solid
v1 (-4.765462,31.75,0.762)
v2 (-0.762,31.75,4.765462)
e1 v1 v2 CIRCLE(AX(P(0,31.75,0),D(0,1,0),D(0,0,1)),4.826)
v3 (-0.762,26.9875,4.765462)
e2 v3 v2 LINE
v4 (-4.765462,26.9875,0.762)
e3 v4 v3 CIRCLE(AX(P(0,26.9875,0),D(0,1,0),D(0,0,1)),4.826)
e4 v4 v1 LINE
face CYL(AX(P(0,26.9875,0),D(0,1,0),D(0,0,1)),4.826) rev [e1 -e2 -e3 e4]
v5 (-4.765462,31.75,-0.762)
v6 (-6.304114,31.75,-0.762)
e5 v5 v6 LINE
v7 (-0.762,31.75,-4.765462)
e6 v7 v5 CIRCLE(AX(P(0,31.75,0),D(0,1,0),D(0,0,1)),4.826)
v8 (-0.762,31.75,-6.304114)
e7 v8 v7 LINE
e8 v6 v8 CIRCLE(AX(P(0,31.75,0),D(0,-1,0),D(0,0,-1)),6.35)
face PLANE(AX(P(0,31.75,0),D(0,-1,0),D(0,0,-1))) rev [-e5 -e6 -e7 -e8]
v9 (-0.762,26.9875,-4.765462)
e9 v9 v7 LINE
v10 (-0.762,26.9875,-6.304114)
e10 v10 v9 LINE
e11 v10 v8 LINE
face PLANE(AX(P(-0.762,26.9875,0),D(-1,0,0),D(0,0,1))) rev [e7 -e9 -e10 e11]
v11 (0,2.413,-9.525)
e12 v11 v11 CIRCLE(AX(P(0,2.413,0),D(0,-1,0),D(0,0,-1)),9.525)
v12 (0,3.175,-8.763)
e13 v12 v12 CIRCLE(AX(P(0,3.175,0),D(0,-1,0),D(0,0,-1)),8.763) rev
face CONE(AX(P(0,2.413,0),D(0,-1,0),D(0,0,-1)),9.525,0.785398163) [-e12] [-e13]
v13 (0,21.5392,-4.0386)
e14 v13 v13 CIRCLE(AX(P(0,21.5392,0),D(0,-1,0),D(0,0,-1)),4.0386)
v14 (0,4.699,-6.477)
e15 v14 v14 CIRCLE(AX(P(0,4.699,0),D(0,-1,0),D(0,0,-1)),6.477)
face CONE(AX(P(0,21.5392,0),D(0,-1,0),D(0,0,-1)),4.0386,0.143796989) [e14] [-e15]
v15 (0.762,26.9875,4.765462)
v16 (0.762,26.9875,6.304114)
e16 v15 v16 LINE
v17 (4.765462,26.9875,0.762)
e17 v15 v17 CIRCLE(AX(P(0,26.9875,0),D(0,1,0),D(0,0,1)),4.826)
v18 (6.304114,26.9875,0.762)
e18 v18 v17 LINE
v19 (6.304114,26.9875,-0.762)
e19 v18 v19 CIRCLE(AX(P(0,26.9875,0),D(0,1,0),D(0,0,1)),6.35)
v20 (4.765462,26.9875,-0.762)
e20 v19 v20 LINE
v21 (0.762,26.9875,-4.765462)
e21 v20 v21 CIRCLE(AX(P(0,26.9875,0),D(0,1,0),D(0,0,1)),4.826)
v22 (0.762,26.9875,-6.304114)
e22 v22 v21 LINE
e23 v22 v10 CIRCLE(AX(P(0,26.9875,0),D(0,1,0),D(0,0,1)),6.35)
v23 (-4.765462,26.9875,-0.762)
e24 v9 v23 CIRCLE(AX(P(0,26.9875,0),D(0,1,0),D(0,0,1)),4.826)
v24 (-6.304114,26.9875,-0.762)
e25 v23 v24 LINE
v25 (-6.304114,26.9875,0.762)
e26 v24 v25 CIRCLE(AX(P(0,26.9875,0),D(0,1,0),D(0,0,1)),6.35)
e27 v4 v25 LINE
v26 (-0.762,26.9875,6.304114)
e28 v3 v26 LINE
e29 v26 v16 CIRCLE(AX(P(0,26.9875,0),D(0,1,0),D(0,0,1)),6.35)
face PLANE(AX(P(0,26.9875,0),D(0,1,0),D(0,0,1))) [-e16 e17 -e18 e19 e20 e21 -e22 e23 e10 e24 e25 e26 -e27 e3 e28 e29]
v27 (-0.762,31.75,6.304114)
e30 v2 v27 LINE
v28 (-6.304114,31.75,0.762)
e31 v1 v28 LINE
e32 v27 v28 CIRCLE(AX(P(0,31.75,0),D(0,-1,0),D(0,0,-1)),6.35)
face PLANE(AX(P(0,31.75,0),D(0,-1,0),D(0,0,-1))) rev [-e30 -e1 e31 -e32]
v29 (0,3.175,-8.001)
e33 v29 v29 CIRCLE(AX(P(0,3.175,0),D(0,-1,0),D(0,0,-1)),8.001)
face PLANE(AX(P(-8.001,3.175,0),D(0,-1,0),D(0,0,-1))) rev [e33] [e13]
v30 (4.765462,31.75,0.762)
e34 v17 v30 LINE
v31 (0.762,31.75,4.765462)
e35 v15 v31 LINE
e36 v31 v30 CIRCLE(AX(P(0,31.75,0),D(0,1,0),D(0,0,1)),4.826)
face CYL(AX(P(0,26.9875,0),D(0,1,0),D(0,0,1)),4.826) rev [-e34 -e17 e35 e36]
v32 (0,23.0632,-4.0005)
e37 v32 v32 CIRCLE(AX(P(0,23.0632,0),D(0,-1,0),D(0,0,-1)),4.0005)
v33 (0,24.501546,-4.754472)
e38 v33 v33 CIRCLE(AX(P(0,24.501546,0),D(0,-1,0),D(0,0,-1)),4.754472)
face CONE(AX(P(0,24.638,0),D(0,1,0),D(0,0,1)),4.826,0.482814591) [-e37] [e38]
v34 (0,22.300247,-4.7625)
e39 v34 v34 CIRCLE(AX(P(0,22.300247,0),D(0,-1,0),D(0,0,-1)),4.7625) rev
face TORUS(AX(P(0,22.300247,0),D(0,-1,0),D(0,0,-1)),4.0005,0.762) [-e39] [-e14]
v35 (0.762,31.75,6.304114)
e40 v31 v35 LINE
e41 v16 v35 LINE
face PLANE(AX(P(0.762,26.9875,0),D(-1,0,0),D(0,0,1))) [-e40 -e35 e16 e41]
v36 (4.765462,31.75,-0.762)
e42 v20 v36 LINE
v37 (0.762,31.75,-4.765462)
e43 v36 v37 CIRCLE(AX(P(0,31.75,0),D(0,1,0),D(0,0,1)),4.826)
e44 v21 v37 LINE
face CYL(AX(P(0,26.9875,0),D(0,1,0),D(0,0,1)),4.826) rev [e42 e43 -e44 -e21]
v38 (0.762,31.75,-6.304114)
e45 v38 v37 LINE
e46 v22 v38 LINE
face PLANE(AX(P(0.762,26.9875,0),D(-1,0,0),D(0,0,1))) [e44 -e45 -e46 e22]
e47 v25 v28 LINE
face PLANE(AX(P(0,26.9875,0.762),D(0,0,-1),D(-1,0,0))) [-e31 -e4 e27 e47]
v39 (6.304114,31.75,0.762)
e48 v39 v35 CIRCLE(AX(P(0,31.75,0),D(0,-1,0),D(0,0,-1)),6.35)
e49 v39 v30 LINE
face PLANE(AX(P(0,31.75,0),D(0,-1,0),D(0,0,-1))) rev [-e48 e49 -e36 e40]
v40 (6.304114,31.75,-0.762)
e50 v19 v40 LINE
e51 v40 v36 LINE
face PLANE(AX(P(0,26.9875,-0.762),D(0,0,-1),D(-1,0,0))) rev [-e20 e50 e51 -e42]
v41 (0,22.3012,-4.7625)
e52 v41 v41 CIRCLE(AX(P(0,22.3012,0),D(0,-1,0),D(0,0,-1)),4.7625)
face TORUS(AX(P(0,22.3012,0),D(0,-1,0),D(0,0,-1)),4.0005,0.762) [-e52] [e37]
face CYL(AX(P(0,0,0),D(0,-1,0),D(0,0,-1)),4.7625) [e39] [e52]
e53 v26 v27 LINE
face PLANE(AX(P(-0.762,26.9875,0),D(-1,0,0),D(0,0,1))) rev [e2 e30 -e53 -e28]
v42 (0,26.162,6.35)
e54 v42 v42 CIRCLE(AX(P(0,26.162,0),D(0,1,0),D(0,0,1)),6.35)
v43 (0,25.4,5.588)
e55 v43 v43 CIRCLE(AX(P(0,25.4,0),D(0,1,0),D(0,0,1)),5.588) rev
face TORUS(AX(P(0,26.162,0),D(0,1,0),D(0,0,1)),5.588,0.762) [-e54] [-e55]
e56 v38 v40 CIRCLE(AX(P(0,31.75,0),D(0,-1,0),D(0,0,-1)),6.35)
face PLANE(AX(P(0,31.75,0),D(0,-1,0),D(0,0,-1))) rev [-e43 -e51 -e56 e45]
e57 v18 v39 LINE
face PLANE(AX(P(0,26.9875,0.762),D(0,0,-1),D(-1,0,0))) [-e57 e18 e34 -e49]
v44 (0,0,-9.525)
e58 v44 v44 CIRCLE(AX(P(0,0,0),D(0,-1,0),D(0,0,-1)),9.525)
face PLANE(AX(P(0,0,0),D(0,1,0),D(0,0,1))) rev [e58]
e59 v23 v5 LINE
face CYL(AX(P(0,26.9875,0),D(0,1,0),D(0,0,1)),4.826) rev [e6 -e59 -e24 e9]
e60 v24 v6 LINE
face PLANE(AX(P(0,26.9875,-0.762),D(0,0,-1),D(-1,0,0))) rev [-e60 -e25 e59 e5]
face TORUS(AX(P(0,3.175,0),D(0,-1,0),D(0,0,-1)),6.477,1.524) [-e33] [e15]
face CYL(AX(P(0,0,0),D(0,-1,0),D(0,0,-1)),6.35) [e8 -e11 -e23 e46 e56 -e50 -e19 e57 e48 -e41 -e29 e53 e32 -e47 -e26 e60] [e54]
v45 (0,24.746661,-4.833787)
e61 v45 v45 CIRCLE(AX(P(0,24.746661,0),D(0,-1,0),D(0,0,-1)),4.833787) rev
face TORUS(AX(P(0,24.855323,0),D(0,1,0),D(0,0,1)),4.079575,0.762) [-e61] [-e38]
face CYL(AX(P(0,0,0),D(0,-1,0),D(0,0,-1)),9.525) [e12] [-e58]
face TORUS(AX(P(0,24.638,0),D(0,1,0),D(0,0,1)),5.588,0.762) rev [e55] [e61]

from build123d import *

# Parameters (mm, degrees)
CHAMFER1_SIZE      = 0.762
FILLET1_R          = 1.524
FILLET3_R          = 0.762
SKETCH3_W          = 1.524
SKETCH3_H          = 1.524
CUT_EXTRUDE1_DEPTH = 4.7625


with BuildPart() as part:
    # Sketch1 → Revolve1 (revolve)
    with BuildSketch(Plane.XY, mode=Mode.PRIVATE) as revolve1_sk:
        Polygon((0, 0), (-9.525, 0), (-9.525, 3.175), (-8.001, 3.175), (-8.001, 4.699), (-6.477, 4.699), (-4.0386, 21.5392), (-4.7625, 21.5392), (-4.7625, 23.0632), (-4.0005, 23.0632), (-4.826, 24.638), (-4.826, 25.4), (-6.35, 25.4), (-6.35, 31.75), (0, 31.75), align=None)
    revolve(revolve1_sk.sketch.rotate(Axis((0, 0, 0), (0, 1, 0)), 270), axis=Axis((0, 0, 0), (0, 1, 0)))

    # Chamfer1
    chamfer1_edges = [part.edges().sort_by_distance(p)[0] for p in [
        (0, 3.175, 9.525),
    ]]
    chamfer(chamfer1_edges, length=CHAMFER1_SIZE)

    # Fillet1
    fillet1_edges = [part.edges().sort_by_distance(p)[0] for p in [
        (0, 4.699, 8.001),
    ]]
    fillet(fillet1_edges, radius=FILLET1_R - 0.0001)  # a hair under: the kernel refuses the full size

    # Fillet2: read off the stored shape, not the designer's step
    # Fillet2 outline → Fillet2 (revolve, cut)
    with BuildSketch(Plane.XY):
        with BuildLine():
            ThreePointArc((6.35, 26.162), (6.126815367, 25.623184633), (5.588, 25.4))
            Line((5.588, 25.4), (6.35, 25.4))
            Line((6.35, 25.4), (6.35, 26.162))
        make_face()
        with BuildLine():
            Line((4.7625, 22.3012), (4.7625, 23.0632))
            Line((4.7625, 23.0632), (4.0005, 23.0632))
            ThreePointArc((4.0005, 23.0632), (4.539315367, 22.840015367), (4.7625, 22.3012))
        make_face()
        with BuildLine():
            Line((4.7625, 21.5392), (4.7625, 22.300246904))
            ThreePointArc((4.7625, 22.300246904), (4.552621454, 21.775074646), (4.0386, 21.5392))
            Line((4.0386, 21.5392), (4.7625, 21.5392))
        make_face()
    revolve(axis=Axis((0, 0, 0), (0, 1, 0)), mode=Mode.SUBTRACT)

    # Fillet2 2 outline → Fillet2 2 (revolve)
    with BuildSketch(Plane.XY):
        with BuildLine():
            ThreePointArc((4.826, 24.638), (5.049184633, 25.176815367), (5.588, 25.4))
            Line((5.588, 25.4), (4.826, 25.4))
            Line((4.826, 25.4), (4.826, 24.638))
        make_face()
    revolve(axis=Axis((0, 0, 0), (0, 1, 0)))

    # Fillet3
    fillet3_edges = [part.edges().sort_by_distance(p)[0] for p in [
        (-3.412497326, 24.638, 3.412497326),
    ]]
    fillet(fillet3_edges, radius=FILLET3_R)

    # Sketch3 → Cut-Extrude1 (cut)
    with BuildSketch(Plane(origin=(0, 31.75, 0), x_dir=(1, 0, 0), z_dir=(0, 1, 0))):
        with BuildLine():
            ThreePointArc((-0.762, 4.765462412), (-3.412497326, 3.412497326), (-4.765462412, 0.762))
            Line((-4.765462412, 0.762), (-0.762, 0.762))
            Line((-0.762, 0.762), (-0.762, 4.765462412))
        make_face()
        with BuildLine():
            ThreePointArc((-4.765462412, 0.762), (-4.826, 0), (-4.765462412, -0.762))
            Line((-4.765462412, -0.762), (-0.762, -0.762))
            Line((-0.762, -0.762), (-0.762, 0.762))
            Line((-0.762, 0.762), (-4.765462412, 0.762))
        make_face()
        with BuildLine():
            Line((-0.762, -0.762), (-4.765462412, -0.762))
            ThreePointArc((-4.765462412, -0.762), (-3.412497326, -3.412497326), (-0.762, -4.765462412))
            Line((-0.762, -4.765462412), (-0.762, -0.762))
        make_face()
        with BuildLine():
            Line((4.765462412, -0.762), (0.762, -0.762))
            Line((0.762, -0.762), (0.762, -4.765462412))
            ThreePointArc((0.762, -4.765462412), (3.412497326, -3.412497326), (4.765462412, -0.762))
        make_face()
        with BuildLine():
            Line((0.762, -0.762), (-0.762, -0.762))
            Line((-0.762, -0.762), (-0.762, -4.765462412))
            ThreePointArc((-0.762, -4.765462412), (0, -4.826), (0.762, -4.765462412))
            Line((0.762, -4.765462412), (0.762, -0.762))
        make_face()
        Rectangle(SKETCH3_W, SKETCH3_H)
        with BuildLine():
            Line((-0.762, 4.765462412), (-0.762, 0.762))
            Line((-0.762, 0.762), (0.762, 0.762))
            Line((0.762, 0.762), (0.762, 4.765462412))
            ThreePointArc((0.762, 4.765462412), (0, 4.826), (-0.762, 4.765462412))
        make_face()
        with BuildLine():
            Line((0.762, 4.765462412), (0.762, 0.762))
            Line((0.762, 0.762), (4.765462412, 0.762))
            ThreePointArc((4.765462412, 0.762), (3.412497326, 3.412497326), (0.762, 4.765462412))
        make_face()
        with BuildLine():
            Line((0.762, 0.762), (0.762, -0.762))
            Line((0.762, -0.762), (4.765462412, -0.762))
            ThreePointArc((4.765462412, -0.762), (4.810841797, -0.382200471), (4.826, 0))
            ThreePointArc((4.826, 0), (4.810841797, 0.382200471), (4.765462412, 0.762))
            Line((4.765462412, 0.762), (0.762, 0.762))
        make_face()
        with BuildLine():
            Line((-0.762, -4.765462412), (-0.762, -6.304114212))
            ThreePointArc((-0.762, -6.304114212), (0, -6.35), (0.762, -6.304114212))
            Line((0.762, -6.304114212), (0.762, -4.765462412))
            ThreePointArc((0.762, -4.765462412), (0, -4.826), (-0.762, -4.765462412))
        make_face()
        with BuildLine():
            ThreePointArc((0.762, 6.304114212), (0, 6.35), (-0.762, 6.304114212))
            Line((-0.762, 6.304114212), (-0.762, 4.765462412))
            ThreePointArc((-0.762, 4.765462412), (0, 4.826), (0.762, 4.765462412))
            Line((0.762, 4.765462412), (0.762, 6.304114212))
        make_face()
        with BuildLine():
            ThreePointArc((-6.304114212, 0.762), (-6.35, 0), (-6.304114212, -0.762))
            Line((-6.304114212, -0.762), (-4.765462412, -0.762))
            ThreePointArc((-4.765462412, -0.762), (-4.826, 0), (-4.765462412, 0.762))
            Line((-4.765462412, 0.762), (-6.304114212, 0.762))
        make_face()
        with BuildLine():
            Line((4.765462412, -0.762), (6.304114212, -0.762))
            ThreePointArc((6.304114212, -0.762), (6.338518173, -0.381690158), (6.35, 0))
            ThreePointArc((6.35, 0), (6.338518173, 0.381690158), (6.304114212, 0.762))
            Line((6.304114212, 0.762), (4.765462412, 0.762))
            ThreePointArc((4.765462412, 0.762), (4.810841797, 0.382200471), (4.826, 0))
            ThreePointArc((4.826, 0), (4.810841797, -0.382200471), (4.765462412, -0.762))
        make_face()
    extrude(amount=-CUT_EXTRUDE1_DEPTH, mode=Mode.SUBTRACT)


solid = part.part
